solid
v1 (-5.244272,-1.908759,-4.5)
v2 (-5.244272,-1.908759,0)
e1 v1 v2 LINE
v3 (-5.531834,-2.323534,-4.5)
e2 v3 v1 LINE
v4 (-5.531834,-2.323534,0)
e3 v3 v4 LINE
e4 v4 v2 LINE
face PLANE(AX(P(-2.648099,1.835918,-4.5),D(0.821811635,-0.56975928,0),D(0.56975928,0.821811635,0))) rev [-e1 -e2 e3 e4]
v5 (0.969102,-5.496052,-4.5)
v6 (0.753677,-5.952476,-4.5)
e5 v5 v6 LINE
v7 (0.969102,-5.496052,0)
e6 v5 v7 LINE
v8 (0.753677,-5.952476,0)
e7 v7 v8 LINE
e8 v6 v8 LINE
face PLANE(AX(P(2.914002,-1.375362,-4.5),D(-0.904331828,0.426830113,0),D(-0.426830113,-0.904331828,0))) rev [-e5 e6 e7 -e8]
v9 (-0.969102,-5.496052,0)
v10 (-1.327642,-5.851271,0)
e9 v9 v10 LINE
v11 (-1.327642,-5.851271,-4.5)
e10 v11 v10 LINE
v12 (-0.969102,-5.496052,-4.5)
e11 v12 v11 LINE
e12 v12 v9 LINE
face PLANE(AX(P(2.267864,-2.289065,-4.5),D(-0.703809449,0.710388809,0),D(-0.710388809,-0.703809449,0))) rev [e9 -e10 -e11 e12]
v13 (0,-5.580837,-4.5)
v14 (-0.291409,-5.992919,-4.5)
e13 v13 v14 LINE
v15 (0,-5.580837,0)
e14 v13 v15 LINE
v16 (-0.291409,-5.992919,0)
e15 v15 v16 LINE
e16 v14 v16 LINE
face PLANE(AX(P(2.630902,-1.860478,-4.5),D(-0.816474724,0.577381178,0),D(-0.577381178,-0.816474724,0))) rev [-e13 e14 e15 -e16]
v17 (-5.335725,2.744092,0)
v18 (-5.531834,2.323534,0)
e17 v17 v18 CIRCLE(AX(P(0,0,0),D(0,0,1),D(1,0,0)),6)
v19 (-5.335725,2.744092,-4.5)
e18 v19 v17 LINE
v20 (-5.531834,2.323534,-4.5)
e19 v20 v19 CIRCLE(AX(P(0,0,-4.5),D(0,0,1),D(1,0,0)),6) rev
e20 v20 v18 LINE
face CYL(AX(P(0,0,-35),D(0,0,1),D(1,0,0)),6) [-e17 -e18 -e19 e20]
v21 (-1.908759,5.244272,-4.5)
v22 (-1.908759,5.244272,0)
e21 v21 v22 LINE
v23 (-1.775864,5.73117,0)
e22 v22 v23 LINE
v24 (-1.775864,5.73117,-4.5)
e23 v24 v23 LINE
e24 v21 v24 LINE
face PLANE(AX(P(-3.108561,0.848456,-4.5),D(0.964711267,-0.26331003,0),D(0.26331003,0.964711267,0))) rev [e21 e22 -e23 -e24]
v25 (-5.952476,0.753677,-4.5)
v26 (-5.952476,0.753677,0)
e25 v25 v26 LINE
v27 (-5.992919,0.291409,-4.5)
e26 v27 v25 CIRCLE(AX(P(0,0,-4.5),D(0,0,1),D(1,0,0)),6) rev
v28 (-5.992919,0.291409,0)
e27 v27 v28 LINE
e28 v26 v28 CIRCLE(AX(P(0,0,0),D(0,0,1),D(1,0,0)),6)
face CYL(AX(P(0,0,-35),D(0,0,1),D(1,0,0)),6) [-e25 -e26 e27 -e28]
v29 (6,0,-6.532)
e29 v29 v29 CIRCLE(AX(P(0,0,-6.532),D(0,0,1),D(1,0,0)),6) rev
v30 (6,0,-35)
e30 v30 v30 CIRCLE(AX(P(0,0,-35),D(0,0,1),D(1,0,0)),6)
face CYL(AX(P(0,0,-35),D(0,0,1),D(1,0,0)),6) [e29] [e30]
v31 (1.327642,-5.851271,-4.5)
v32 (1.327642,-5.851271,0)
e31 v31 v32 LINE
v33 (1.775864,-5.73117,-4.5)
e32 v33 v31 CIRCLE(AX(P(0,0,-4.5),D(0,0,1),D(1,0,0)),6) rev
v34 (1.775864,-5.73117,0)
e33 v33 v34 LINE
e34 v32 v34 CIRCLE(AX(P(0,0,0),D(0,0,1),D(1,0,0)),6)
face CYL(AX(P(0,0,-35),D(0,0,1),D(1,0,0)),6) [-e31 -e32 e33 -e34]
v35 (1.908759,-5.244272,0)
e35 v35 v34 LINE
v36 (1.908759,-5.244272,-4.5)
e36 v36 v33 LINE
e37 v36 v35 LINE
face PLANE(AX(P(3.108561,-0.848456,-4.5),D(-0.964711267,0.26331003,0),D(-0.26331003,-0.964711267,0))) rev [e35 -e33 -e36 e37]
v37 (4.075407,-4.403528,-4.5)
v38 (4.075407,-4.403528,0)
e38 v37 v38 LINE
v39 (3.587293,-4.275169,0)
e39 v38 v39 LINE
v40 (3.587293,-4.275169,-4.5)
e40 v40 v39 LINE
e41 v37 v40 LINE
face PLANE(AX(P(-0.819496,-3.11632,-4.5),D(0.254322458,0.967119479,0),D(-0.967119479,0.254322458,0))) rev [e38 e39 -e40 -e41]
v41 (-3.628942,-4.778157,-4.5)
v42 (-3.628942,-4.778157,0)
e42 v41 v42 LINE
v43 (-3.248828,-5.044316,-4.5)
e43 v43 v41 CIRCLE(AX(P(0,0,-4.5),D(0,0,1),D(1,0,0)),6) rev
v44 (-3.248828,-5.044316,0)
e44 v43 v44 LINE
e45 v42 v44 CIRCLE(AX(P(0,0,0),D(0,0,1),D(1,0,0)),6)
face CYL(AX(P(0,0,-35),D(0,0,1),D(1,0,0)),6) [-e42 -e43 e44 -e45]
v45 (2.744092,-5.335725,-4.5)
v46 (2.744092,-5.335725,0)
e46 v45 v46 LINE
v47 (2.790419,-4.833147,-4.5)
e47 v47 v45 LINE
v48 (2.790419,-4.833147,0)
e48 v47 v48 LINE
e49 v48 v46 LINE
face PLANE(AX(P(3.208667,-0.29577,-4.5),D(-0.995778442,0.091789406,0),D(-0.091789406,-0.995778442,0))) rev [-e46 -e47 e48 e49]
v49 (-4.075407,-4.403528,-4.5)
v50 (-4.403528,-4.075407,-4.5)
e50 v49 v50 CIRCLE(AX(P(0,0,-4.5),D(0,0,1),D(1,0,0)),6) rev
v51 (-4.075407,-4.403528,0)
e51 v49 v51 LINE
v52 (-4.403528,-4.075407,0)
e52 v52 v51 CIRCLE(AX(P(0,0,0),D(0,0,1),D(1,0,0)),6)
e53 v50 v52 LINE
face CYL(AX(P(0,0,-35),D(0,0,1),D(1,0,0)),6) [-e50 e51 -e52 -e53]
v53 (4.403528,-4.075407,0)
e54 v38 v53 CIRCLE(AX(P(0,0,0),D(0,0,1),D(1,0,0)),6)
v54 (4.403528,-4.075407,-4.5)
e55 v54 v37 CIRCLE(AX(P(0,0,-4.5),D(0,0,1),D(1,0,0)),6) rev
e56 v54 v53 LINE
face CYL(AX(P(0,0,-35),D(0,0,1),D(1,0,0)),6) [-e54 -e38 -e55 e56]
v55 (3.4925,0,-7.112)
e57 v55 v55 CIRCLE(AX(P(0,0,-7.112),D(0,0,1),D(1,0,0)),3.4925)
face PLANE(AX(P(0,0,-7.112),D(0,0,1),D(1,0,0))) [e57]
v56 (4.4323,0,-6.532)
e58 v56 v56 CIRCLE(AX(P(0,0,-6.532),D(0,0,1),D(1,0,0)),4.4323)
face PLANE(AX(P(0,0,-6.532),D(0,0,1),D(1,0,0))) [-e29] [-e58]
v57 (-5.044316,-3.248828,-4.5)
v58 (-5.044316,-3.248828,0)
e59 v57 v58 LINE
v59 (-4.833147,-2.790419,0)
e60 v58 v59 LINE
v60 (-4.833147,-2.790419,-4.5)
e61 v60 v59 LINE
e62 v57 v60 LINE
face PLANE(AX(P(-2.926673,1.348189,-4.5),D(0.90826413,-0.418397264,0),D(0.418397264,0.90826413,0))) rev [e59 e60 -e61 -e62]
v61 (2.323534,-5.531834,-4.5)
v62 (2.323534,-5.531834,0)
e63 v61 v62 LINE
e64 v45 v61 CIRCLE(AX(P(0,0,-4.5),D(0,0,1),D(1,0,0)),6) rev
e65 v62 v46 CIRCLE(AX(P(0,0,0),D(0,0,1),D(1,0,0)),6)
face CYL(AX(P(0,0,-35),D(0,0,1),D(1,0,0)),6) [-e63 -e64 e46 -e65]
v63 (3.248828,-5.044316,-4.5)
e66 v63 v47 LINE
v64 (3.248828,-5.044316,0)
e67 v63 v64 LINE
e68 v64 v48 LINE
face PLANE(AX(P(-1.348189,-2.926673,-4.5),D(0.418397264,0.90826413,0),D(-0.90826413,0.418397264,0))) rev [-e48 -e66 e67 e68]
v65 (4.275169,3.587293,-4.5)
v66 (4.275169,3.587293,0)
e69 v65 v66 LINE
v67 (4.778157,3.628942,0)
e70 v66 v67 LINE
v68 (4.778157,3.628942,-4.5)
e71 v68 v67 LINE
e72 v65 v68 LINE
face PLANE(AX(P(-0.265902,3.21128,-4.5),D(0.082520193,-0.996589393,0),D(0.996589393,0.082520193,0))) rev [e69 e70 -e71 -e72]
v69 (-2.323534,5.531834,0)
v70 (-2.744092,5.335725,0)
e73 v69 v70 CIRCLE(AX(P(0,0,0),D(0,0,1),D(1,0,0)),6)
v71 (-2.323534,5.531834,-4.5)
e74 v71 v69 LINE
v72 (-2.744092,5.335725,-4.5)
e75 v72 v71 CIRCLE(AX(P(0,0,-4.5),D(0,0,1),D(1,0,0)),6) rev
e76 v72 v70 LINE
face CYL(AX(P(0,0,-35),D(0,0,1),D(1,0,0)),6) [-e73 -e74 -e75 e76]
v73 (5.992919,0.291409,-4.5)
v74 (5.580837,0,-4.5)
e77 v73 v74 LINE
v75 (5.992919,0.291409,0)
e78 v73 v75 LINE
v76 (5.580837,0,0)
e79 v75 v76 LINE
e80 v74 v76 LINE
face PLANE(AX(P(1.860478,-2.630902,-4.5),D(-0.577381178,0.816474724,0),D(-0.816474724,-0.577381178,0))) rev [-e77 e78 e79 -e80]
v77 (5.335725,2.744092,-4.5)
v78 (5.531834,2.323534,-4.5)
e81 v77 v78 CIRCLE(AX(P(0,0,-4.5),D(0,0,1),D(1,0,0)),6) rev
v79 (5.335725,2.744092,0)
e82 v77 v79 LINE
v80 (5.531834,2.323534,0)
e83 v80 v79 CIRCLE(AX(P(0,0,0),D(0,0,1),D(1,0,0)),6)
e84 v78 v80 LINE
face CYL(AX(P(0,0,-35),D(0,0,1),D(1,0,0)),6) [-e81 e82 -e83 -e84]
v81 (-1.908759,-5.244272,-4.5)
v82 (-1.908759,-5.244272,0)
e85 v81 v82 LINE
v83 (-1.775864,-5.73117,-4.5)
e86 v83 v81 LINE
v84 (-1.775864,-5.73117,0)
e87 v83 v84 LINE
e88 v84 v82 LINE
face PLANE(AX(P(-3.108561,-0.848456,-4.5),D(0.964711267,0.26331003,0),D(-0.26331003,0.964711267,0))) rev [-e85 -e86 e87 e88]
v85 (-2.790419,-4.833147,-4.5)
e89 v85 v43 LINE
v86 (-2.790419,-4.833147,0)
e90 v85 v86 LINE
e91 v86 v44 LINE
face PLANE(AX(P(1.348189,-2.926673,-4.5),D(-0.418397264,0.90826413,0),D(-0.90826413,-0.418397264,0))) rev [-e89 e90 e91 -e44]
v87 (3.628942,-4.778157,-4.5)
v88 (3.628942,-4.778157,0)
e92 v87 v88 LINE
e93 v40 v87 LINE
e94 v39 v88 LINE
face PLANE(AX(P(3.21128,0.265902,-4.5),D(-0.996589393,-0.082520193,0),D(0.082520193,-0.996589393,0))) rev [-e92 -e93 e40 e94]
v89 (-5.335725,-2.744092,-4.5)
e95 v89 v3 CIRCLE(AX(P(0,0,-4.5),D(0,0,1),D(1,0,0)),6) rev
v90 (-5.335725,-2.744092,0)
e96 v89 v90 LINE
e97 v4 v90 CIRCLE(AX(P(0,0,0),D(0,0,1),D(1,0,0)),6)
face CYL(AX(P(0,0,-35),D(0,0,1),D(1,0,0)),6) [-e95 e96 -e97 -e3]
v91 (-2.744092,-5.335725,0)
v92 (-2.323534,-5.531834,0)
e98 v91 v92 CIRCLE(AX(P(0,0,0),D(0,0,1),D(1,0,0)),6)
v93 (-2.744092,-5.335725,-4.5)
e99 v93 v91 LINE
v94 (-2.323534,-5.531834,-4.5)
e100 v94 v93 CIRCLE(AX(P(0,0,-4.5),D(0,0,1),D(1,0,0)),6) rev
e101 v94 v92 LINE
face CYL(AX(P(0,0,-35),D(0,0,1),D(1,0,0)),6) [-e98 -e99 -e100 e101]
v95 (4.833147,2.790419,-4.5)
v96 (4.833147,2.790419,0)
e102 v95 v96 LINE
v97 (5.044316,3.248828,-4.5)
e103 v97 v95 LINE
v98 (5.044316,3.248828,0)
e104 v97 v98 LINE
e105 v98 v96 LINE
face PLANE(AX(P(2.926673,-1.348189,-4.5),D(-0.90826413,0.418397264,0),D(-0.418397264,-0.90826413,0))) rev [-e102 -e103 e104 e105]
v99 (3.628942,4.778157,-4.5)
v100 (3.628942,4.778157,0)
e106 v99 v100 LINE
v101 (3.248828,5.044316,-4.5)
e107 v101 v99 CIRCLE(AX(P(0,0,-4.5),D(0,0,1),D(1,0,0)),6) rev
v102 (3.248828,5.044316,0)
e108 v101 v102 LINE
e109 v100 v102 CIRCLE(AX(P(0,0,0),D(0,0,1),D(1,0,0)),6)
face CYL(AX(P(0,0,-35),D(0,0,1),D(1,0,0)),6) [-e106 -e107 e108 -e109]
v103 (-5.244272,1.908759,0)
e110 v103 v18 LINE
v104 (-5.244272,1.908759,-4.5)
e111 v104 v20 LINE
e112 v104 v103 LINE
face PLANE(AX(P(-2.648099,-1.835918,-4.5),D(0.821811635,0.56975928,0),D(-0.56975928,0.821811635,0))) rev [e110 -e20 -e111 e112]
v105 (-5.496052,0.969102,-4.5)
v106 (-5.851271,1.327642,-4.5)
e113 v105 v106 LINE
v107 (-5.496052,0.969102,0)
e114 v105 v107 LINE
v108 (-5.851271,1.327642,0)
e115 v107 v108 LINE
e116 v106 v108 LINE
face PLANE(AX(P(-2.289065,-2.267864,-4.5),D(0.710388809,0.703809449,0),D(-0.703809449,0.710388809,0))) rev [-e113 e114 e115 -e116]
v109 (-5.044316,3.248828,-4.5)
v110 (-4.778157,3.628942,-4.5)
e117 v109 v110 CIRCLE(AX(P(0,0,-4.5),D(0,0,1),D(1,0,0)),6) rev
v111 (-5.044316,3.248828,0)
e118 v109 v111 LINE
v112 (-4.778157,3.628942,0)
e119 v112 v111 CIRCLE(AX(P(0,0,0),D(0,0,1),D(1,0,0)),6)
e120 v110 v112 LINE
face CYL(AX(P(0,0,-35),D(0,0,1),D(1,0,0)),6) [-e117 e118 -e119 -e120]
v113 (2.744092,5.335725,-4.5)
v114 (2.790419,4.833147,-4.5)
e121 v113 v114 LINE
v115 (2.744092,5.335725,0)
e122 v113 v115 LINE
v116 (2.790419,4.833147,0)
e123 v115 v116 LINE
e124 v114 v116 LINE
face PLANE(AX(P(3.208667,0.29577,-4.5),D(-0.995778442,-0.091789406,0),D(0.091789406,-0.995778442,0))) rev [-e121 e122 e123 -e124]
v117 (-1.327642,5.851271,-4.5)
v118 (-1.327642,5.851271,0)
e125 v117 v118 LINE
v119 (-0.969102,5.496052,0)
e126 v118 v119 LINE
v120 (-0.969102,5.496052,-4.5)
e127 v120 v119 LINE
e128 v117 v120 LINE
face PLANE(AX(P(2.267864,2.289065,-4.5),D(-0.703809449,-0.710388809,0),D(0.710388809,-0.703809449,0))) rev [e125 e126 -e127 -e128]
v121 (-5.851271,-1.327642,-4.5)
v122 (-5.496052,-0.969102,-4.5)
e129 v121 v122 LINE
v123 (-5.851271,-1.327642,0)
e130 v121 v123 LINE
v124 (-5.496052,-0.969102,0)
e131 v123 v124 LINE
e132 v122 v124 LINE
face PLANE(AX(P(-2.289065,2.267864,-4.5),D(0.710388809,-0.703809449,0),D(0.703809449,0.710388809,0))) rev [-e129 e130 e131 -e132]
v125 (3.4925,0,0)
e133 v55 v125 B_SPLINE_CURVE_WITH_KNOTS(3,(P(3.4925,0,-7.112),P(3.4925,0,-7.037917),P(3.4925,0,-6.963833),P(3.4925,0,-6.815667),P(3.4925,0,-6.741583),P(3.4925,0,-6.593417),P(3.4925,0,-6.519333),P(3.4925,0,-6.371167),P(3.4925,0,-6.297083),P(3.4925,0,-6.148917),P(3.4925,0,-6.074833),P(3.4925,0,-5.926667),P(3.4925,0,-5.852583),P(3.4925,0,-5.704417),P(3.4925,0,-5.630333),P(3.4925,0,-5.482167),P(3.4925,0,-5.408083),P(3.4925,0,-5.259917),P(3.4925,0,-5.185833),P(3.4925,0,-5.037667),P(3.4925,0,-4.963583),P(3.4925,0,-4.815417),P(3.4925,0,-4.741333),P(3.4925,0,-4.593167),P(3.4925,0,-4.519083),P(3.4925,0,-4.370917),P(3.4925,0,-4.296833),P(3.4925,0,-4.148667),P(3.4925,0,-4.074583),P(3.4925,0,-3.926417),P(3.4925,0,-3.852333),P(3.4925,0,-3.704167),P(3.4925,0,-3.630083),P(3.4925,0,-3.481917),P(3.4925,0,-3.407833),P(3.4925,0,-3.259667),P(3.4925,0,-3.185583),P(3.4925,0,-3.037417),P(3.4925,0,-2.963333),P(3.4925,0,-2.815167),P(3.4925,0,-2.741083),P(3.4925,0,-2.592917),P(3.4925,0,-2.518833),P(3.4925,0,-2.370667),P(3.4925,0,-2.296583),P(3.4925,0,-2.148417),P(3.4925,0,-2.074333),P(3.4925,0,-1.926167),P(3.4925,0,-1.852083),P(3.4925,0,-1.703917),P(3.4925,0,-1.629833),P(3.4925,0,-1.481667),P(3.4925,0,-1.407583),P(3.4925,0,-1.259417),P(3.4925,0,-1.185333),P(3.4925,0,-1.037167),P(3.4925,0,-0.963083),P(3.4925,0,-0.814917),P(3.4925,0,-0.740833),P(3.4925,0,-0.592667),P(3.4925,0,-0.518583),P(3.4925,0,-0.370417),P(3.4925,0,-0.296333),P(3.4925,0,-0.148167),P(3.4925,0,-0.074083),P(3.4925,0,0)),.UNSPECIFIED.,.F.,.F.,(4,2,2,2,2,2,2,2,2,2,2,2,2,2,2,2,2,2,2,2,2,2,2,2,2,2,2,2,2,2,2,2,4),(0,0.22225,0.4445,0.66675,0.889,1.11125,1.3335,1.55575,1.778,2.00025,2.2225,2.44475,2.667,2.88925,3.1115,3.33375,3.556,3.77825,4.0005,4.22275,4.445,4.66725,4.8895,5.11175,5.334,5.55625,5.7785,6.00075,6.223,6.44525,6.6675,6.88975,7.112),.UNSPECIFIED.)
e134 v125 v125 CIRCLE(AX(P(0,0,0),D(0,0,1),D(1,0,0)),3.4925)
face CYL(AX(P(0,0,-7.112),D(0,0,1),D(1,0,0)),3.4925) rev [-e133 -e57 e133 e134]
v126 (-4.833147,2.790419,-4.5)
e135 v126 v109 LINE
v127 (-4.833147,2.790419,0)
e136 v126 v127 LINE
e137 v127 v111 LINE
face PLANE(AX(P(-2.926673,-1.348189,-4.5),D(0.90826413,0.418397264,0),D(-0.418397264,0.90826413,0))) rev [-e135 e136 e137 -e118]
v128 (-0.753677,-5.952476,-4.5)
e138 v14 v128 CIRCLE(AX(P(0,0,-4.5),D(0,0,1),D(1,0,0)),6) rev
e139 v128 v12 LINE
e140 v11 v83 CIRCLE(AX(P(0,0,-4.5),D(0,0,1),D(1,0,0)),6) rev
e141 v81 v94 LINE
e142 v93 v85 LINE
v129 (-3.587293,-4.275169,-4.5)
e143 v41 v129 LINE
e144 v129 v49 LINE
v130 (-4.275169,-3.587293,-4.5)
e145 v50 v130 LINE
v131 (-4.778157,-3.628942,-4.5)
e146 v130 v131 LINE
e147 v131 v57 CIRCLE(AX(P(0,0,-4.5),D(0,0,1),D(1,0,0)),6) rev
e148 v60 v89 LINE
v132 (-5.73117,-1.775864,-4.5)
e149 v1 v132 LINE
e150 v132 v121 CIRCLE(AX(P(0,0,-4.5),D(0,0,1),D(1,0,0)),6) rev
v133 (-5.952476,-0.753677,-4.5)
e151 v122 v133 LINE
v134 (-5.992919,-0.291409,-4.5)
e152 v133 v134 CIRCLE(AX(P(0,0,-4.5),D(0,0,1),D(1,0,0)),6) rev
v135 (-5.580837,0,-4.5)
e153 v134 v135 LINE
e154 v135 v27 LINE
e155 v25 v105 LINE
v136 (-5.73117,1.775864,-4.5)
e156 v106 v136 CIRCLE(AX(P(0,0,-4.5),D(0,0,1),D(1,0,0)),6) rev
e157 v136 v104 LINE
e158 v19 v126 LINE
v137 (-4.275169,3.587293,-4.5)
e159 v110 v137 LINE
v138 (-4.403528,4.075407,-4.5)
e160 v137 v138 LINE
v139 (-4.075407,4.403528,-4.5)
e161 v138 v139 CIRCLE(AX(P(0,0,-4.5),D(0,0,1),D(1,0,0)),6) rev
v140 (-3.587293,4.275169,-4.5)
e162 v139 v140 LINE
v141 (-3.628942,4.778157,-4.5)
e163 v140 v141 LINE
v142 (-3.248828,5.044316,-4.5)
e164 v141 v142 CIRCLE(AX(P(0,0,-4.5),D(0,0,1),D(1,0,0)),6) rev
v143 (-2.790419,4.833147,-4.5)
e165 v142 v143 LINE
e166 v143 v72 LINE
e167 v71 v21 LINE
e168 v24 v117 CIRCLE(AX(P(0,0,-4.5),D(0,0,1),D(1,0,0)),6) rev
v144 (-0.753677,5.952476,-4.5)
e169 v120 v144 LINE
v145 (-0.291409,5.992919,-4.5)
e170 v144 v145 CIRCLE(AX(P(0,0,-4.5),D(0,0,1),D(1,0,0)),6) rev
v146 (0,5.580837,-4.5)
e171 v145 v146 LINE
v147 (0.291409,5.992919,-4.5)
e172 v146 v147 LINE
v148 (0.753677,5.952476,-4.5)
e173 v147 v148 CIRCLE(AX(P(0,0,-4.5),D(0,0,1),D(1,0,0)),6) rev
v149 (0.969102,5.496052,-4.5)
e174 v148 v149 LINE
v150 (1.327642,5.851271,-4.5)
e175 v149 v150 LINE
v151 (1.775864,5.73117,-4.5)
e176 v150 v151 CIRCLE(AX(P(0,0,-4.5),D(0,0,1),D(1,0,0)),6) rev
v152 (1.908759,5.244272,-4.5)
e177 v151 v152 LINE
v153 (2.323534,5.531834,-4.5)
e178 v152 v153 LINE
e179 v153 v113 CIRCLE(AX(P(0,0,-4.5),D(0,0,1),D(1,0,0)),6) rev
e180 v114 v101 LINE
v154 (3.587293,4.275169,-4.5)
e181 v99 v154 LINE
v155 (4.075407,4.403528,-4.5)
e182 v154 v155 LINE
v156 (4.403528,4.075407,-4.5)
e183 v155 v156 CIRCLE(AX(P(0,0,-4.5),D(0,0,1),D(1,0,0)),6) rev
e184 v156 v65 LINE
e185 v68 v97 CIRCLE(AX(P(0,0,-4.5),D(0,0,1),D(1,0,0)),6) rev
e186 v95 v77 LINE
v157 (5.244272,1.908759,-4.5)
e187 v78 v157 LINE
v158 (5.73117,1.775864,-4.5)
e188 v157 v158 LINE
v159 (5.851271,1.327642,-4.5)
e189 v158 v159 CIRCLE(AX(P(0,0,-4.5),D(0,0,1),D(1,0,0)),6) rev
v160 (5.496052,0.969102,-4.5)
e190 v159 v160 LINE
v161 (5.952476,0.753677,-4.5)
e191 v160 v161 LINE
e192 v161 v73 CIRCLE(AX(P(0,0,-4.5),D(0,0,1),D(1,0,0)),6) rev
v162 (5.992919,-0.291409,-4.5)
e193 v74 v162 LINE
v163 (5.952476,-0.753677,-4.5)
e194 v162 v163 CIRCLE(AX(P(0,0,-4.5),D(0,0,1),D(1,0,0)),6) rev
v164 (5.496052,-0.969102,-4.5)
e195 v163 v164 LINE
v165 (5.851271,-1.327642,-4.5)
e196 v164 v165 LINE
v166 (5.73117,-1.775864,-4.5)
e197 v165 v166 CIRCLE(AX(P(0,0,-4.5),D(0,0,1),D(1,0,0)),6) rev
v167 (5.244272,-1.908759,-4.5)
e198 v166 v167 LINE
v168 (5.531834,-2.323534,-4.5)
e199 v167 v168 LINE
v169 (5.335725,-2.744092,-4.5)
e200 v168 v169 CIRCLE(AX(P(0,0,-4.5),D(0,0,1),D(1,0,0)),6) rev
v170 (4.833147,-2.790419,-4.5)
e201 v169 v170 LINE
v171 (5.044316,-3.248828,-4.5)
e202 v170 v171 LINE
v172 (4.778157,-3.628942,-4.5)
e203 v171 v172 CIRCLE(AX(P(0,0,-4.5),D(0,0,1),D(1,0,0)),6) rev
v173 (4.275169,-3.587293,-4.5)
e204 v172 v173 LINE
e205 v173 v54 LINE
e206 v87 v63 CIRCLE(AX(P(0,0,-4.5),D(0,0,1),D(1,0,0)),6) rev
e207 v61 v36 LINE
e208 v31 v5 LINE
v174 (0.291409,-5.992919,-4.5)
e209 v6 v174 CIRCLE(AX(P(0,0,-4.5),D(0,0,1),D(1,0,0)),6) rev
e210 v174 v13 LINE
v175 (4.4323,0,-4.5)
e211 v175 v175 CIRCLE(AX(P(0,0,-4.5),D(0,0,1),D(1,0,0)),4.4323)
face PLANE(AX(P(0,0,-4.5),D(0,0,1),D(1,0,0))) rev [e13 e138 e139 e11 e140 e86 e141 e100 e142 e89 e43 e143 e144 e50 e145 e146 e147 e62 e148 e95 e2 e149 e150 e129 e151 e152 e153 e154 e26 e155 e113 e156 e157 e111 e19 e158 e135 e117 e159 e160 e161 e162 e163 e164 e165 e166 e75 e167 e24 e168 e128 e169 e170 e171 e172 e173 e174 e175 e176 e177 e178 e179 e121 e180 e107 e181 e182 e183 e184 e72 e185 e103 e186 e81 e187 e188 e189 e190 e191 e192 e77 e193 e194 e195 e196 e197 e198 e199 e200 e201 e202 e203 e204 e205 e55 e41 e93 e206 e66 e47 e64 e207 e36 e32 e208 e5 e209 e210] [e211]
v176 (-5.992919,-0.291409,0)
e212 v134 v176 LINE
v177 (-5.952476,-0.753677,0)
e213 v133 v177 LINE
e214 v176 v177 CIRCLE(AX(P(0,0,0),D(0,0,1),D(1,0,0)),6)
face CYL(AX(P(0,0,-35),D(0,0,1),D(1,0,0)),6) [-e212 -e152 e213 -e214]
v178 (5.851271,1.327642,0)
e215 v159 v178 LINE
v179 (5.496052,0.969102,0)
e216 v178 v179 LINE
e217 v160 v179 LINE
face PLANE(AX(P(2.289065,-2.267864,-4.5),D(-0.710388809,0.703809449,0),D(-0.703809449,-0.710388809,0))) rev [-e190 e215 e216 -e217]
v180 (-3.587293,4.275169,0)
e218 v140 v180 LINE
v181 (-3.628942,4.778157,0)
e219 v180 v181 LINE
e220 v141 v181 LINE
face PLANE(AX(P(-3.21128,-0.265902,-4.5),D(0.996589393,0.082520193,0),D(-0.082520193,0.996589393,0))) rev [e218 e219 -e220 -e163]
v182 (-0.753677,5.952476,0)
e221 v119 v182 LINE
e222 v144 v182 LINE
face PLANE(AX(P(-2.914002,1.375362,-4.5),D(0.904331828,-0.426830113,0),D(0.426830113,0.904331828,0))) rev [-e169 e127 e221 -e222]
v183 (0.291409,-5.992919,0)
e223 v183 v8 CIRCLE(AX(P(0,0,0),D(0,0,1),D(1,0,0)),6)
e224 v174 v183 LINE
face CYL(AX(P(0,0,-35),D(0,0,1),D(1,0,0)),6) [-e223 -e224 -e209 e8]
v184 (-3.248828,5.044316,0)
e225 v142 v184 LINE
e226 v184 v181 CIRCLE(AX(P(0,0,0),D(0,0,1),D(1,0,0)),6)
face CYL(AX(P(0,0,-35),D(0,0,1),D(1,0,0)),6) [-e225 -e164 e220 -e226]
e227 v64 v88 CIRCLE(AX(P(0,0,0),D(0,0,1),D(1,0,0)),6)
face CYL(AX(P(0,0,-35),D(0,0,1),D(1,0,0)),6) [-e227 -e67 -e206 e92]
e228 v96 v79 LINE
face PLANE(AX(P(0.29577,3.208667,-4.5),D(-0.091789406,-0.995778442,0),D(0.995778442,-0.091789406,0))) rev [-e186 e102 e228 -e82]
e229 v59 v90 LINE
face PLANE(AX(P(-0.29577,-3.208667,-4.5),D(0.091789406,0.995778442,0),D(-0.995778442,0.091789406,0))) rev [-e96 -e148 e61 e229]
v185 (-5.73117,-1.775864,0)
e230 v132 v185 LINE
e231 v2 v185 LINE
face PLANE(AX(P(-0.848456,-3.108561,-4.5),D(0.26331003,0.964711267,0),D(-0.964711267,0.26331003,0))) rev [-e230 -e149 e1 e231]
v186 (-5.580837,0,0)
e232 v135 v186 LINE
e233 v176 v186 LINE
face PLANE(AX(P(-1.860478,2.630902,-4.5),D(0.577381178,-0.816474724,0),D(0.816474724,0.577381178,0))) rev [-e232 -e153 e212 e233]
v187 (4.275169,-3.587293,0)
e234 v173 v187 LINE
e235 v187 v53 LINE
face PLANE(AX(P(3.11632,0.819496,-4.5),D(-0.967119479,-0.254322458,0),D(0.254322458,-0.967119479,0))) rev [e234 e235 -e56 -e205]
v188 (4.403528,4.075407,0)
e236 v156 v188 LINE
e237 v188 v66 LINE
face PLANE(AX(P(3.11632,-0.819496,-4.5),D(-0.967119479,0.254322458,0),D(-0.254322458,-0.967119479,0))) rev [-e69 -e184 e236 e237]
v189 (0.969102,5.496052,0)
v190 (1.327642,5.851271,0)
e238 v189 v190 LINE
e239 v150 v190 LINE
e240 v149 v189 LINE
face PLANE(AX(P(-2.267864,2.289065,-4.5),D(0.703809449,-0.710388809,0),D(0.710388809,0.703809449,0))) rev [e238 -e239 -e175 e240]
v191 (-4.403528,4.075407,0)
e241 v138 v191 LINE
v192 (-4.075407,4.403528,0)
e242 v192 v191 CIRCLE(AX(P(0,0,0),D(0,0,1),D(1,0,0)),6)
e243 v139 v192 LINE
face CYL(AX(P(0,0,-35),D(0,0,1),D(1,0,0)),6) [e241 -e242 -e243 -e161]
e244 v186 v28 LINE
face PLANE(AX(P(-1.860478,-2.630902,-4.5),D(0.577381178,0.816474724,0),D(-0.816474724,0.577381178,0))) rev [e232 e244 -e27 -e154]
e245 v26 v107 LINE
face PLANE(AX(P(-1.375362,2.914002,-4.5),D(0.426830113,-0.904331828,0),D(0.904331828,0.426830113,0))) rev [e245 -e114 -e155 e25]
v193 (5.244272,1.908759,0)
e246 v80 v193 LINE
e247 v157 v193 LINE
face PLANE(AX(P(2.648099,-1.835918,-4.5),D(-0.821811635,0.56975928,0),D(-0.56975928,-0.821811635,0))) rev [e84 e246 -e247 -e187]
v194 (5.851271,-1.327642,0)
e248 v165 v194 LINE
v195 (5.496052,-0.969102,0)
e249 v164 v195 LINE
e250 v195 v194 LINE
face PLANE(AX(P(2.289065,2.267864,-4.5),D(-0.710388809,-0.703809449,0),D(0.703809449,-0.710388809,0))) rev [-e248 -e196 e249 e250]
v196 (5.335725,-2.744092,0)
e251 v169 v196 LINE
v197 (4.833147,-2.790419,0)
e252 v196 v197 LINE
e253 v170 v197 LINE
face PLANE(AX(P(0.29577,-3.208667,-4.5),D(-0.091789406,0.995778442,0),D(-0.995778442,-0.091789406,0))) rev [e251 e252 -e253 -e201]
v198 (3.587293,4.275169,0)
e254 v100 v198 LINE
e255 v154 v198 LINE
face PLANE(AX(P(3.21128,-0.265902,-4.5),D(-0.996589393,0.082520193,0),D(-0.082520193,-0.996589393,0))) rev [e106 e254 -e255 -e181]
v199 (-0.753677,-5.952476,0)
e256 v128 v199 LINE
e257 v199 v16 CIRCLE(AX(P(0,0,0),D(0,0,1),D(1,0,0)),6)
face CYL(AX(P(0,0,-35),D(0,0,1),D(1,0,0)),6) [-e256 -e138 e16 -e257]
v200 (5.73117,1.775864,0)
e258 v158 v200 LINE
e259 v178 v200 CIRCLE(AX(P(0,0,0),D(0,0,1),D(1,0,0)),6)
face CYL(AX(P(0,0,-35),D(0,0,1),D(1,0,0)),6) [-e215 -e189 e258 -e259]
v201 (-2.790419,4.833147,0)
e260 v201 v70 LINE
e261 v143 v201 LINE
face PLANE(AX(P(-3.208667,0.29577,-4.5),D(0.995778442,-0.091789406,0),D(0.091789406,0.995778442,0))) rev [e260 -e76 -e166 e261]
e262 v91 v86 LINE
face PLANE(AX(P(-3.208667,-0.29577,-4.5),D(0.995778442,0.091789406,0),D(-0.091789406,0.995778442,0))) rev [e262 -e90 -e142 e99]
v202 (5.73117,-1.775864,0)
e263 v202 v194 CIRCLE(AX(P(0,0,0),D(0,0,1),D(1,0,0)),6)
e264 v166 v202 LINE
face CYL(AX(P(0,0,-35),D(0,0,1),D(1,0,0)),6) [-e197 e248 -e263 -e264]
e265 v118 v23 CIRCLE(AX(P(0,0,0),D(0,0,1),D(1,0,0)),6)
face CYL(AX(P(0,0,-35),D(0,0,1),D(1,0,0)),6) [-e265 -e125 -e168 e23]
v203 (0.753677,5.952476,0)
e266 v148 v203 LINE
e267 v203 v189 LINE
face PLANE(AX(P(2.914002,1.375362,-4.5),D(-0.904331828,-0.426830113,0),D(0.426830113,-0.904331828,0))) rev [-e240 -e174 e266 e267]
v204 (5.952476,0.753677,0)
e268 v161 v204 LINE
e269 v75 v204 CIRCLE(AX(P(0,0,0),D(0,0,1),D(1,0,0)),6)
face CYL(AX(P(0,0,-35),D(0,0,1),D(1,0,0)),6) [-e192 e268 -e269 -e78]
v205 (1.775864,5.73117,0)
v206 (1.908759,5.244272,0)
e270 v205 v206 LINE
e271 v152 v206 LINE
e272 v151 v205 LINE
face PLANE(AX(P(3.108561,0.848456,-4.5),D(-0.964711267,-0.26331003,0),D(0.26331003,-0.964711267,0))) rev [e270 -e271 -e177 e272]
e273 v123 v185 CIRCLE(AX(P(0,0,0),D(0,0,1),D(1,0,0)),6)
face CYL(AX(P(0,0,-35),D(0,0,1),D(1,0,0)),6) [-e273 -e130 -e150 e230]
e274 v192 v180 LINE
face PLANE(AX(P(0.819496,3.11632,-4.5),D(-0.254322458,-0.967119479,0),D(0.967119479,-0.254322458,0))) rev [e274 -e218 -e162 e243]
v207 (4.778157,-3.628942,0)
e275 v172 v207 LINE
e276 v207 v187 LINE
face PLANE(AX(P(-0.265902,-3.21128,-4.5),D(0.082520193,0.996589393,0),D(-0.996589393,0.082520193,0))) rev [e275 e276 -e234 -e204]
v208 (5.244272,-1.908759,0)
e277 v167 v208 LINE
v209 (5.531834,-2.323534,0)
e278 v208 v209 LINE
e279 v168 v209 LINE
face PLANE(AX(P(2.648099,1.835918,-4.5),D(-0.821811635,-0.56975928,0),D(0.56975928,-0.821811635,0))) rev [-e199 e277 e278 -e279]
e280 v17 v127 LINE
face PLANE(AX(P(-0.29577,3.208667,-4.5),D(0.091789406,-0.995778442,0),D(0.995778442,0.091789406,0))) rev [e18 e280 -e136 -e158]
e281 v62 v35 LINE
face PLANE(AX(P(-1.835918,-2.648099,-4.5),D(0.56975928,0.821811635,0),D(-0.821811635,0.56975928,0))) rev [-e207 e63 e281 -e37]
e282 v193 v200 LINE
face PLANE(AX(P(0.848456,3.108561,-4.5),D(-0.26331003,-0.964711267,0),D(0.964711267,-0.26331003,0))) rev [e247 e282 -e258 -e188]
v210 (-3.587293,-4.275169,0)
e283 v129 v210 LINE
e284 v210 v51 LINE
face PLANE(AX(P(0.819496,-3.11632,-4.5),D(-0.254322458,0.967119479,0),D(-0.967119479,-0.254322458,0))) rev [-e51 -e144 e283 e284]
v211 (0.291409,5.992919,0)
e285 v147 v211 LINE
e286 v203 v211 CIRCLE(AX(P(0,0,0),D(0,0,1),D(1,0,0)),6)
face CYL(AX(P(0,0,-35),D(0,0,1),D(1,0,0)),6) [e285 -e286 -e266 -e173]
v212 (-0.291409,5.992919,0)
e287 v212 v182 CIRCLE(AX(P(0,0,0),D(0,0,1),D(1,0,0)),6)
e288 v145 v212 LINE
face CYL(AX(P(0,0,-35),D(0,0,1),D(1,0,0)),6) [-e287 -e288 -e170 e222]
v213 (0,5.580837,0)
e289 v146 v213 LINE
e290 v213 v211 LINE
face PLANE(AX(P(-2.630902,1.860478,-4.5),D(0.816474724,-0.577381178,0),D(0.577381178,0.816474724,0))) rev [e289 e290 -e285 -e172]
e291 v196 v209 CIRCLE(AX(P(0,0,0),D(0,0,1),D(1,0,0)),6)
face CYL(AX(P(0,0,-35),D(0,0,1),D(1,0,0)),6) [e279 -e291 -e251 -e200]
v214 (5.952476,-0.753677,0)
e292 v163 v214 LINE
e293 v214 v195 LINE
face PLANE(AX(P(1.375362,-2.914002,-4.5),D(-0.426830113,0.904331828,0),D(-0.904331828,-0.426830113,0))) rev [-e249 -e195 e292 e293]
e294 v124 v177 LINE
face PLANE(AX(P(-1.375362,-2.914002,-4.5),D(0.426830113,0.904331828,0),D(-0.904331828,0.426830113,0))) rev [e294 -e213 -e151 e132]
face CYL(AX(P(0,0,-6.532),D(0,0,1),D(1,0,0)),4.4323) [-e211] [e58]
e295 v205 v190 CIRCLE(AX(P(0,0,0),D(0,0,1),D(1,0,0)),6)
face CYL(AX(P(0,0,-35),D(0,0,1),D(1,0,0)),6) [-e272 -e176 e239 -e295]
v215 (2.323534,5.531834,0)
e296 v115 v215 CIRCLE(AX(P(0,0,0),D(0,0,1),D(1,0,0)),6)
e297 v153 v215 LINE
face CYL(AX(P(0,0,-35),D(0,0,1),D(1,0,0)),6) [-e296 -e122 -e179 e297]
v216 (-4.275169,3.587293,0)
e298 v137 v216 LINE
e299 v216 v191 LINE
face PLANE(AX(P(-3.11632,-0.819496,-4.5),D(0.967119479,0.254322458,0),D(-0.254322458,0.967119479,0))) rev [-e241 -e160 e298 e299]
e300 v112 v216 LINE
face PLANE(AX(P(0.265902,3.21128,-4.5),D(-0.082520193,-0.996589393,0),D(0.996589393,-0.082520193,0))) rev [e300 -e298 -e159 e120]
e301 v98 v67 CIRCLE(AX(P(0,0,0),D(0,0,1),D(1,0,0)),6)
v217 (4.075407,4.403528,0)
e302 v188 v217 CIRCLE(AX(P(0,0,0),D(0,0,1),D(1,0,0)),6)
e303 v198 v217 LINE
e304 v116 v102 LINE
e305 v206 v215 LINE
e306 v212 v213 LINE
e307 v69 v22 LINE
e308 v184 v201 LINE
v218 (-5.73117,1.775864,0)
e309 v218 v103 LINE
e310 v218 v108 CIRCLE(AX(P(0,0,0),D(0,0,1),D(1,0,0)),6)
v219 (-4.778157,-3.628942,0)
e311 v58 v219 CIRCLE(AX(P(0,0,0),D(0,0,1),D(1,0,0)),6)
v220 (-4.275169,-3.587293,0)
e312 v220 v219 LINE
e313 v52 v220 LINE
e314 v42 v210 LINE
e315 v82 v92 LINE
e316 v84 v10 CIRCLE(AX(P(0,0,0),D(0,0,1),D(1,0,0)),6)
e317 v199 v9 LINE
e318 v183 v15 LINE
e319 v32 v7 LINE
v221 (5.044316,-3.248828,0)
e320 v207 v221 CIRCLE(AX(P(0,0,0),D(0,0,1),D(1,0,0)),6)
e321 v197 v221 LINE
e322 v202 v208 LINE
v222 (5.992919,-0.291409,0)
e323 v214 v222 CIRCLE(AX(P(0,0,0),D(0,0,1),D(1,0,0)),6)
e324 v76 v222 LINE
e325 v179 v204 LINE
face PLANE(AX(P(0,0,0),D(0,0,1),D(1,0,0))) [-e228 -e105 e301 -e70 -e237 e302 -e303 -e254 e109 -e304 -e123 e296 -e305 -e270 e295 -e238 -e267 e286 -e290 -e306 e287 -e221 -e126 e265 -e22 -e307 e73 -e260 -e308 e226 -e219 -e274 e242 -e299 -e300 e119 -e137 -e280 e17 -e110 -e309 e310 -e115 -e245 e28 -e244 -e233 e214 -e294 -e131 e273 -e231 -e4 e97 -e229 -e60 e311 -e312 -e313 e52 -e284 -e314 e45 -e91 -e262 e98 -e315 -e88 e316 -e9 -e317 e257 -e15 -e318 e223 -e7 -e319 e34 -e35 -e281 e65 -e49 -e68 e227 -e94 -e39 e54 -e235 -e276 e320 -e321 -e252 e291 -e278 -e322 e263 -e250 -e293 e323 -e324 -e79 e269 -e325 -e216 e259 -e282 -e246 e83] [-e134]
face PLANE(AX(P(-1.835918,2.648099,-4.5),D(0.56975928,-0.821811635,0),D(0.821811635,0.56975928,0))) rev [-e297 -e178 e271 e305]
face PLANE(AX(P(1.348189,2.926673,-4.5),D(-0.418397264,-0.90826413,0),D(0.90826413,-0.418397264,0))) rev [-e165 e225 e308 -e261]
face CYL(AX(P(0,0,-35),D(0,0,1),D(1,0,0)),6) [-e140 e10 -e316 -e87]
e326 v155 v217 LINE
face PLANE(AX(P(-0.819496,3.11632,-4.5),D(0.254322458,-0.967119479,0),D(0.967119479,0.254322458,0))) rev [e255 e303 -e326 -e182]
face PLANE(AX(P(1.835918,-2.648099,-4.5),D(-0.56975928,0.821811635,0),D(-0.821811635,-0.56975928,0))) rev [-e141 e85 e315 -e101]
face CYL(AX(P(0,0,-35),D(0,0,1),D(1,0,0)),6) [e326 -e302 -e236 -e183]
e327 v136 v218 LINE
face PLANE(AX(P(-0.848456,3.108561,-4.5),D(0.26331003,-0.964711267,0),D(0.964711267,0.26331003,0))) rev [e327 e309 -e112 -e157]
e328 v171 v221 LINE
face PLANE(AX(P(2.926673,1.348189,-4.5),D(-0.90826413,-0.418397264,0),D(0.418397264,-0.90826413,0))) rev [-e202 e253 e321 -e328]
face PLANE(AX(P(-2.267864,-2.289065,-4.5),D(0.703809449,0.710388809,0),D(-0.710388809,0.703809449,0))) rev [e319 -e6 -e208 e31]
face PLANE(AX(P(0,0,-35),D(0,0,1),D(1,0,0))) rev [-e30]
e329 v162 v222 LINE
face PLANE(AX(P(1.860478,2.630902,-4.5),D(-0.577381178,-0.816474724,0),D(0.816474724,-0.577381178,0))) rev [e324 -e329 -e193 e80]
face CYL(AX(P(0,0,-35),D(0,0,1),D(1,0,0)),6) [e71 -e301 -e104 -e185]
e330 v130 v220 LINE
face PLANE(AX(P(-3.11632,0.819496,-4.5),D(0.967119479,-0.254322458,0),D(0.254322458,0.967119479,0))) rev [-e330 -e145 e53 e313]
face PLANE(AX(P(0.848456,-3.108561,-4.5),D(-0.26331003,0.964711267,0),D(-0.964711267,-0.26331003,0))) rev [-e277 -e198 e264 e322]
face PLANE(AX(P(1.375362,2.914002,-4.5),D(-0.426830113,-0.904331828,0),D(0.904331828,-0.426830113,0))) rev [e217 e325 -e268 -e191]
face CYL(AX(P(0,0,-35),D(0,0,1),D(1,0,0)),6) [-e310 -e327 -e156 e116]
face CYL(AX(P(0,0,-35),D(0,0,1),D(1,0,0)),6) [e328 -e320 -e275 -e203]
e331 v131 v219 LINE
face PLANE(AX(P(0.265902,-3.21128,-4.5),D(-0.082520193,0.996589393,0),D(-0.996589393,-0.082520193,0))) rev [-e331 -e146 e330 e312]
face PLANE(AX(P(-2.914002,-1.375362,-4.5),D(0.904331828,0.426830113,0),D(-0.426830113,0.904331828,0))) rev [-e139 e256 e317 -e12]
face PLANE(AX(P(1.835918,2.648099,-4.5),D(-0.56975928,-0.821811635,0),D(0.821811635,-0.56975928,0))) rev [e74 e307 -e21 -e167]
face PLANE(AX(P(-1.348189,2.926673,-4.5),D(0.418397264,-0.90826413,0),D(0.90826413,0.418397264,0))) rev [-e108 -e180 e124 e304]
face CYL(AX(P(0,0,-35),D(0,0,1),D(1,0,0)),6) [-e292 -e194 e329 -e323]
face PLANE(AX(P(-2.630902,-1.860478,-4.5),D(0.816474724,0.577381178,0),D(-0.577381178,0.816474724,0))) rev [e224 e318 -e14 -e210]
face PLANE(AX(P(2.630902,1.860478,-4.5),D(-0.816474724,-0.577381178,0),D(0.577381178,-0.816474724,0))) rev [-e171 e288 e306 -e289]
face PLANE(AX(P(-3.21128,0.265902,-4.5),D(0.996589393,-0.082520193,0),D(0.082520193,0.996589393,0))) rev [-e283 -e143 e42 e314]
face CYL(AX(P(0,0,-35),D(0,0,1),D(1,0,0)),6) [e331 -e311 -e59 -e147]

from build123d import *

# Parameters (mm, degrees)
SKETCH1_R           = 6
BOSS_EXTRUDE1_DEPTH = 35
SKETCH4_OUTSIDE_W   = 21.78
SKETCH4_OUTSIDE_H   = 21.78
CUT_EXTRUDE5_DEPTH  = 4.5
SKETCH6_R           = 6.880488524
SKETCH6_R_2         = 4.4323
CUT_EXTRUDE6_DEPTH  = 2.032
SKETCH7_R           = 3.4925
CUT_EXTRUDE7_DEPTH  = 7.112


with BuildPart() as part:
    # Sketch1 → Boss-Extrude1 (new body)
    with BuildSketch(Plane.XY):
        Circle(SKETCH1_R)
    extrude(amount=-BOSS_EXTRUDE1_DEPTH)

    # Sketch4 outside → Cut-Extrude5 (cut)
    with BuildSketch(Plane.XY):
        Rectangle(SKETCH4_OUTSIDE_W, SKETCH4_OUTSIDE_H)
        with BuildLine():
            Line((5.5808372, 0), (5.992919203, 0.291409379))
            ThreePointArc((5.992919203, 0.291409379), (5.977168189, 0.522934456), (5.952476002, 0.753677283))
            Line((5.952476002, 0.753677283), (5.496051743, 0.96910221))
            Line((5.496051743, 0.96910221), (5.851270587, 1.327641714))
            ThreePointArc((5.851270587, 1.327641714), (5.795554958, 1.552914271), (5.73116983, 1.775863842))
            Line((5.73116983, 1.775863842), (5.244271535, 1.908758739))
            Line((5.244271535, 1.908758739), (5.531834074, 2.323534328))
            ThreePointArc((5.531834074, 2.323534328), (5.437846722, 2.53570957), (5.335724962, 2.744091676))
            Line((5.335724962, 2.744091676), (4.83314679, 2.7904186))
            Line((4.83314679, 2.7904186), (5.044315583, 3.248827527))
            ThreePointArc((5.044315583, 3.248827527), (4.914912266, 3.441458618), (4.778156792, 3.628941674))
            Line((4.778156792, 3.628941674), (4.275169325, 3.587293004))
            Line((4.275169325, 3.587293004), (4.403528115, 4.075406745))
            ThreePointArc((4.403528115, 4.075406745), (4.242640687, 4.242640687), (4.075406745, 4.403528115))
            Line((4.075406745, 4.403528115), (3.587293004, 4.275169325))
            Line((3.587293004, 4.275169325), (3.628941674, 4.778156792))
            ThreePointArc((3.628941674, 4.778156792), (3.441458618, 4.914912266), (3.248827527, 5.044315583))
            Line((3.248827527, 5.044315583), (2.7904186, 4.83314679))
            Line((2.7904186, 4.83314679), (2.744091676, 5.335724962))
            ThreePointArc((2.744091676, 5.335724962), (2.53570957, 5.437846722), (2.323534328, 5.531834074))
            Line((2.323534328, 5.531834074), (1.908758739, 5.244271535))
            Line((1.908758739, 5.244271535), (1.775863842, 5.73116983))
            ThreePointArc((1.775863842, 5.73116983), (1.552914271, 5.795554958), (1.327641714, 5.851270587))
            Line((1.327641714, 5.851270587), (0.96910221, 5.496051743))
            Line((0.96910221, 5.496051743), (0.753677283, 5.952476002))
            ThreePointArc((0.753677283, 5.952476002), (0.522934456, 5.977168189), (0.291409379, 5.992919203))
            Line((0.291409379, 5.992919203), (0, 5.5808372))
            Line((0, 5.5808372), (-0.291409379, 5.992919203))
            ThreePointArc((-0.291409379, 5.992919203), (-0.522934456, 5.977168189), (-0.753677283, 5.952476002))
            Line((-0.753677283, 5.952476002), (-0.96910221, 5.496051743))
            Line((-0.96910221, 5.496051743), (-1.327641714, 5.851270587))
            ThreePointArc((-1.327641714, 5.851270587), (-1.552914271, 5.795554958), (-1.775863842, 5.73116983))
            Line((-1.775863842, 5.73116983), (-1.908758739, 5.244271535))
            Line((-1.908758739, 5.244271535), (-2.323534328, 5.531834074))
            ThreePointArc((-2.323534328, 5.531834074), (-2.53570957, 5.437846722), (-2.744091676, 5.335724962))
            Line((-2.744091676, 5.335724962), (-2.7904186, 4.83314679))
            Line((-2.7904186, 4.83314679), (-3.248827527, 5.044315583))
            ThreePointArc((-3.248827527, 5.044315583), (-3.441458618, 4.914912266), (-3.628941674, 4.778156792))
            Line((-3.628941674, 4.778156792), (-3.587293004, 4.275169325))
            Line((-3.587293004, 4.275169325), (-4.075406745, 4.403528115))
            ThreePointArc((-4.075406745, 4.403528115), (-4.242640687, 4.242640687), (-4.403528115, 4.075406745))
            Line((-4.403528115, 4.075406745), (-4.275169325, 3.587293004))
            Line((-4.275169325, 3.587293004), (-4.778156792, 3.628941674))
            ThreePointArc((-4.778156792, 3.628941674), (-4.914912266, 3.441458618), (-5.044315583, 3.248827527))
            Line((-5.044315583, 3.248827527), (-4.83314679, 2.7904186))
            Line((-4.83314679, 2.7904186), (-5.335724962, 2.744091676))
            ThreePointArc((-5.335724962, 2.744091676), (-5.437846722, 2.53570957), (-5.531834074, 2.323534328))
            Line((-5.531834074, 2.323534328), (-5.244271535, 1.908758739))
            Line((-5.244271535, 1.908758739), (-5.73116983, 1.775863842))
            ThreePointArc((-5.73116983, 1.775863842), (-5.795554958, 1.552914271), (-5.851270587, 1.327641714))
            Line((-5.851270587, 1.327641714), (-5.496051743, 0.96910221))
            Line((-5.496051743, 0.96910221), (-5.952476002, 0.753677283))
            ThreePointArc((-5.952476002, 0.753677283), (-5.977168189, 0.522934456), (-5.992919203, 0.291409379))
            Line((-5.992919203, 0.291409379), (-5.5808372, 0))
            Line((-5.5808372, 0), (-5.992919203, -0.291409379))
            ThreePointArc((-5.992919203, -0.291409379), (-5.977168189, -0.522934456), (-5.952476002, -0.753677283))
            Line((-5.952476002, -0.753677283), (-5.496051743, -0.96910221))
            Line((-5.496051743, -0.96910221), (-5.851270587, -1.327641714))
            ThreePointArc((-5.851270587, -1.327641714), (-5.795554958, -1.552914271), (-5.73116983, -1.775863842))
            Line((-5.73116983, -1.775863842), (-5.244271535, -1.908758739))
            Line((-5.244271535, -1.908758739), (-5.531834074, -2.323534328))
            ThreePointArc((-5.531834074, -2.323534328), (-5.437846722, -2.53570957), (-5.335724962, -2.744091676))
            Line((-5.335724962, -2.744091676), (-4.83314679, -2.7904186))
            Line((-4.83314679, -2.7904186), (-5.044315583, -3.248827527))
            ThreePointArc((-5.044315583, -3.248827527), (-4.914912266, -3.441458618), (-4.778156792, -3.628941674))
            Line((-4.778156792, -3.628941674), (-4.275169325, -3.587293004))
            Line((-4.275169325, -3.587293004), (-4.403528115, -4.075406745))
            ThreePointArc((-4.403528115, -4.075406745), (-4.242640687, -4.242640687), (-4.075406745, -4.403528115))
            Line((-4.075406745, -4.403528115), (-3.587293004, -4.275169325))
            Line((-3.587293004, -4.275169325), (-3.628941674, -4.778156792))
            ThreePointArc((-3.628941674, -4.778156792), (-3.441458618, -4.914912266), (-3.248827527, -5.044315583))
            Line((-3.248827527, -5.044315583), (-2.7904186, -4.83314679))
            Line((-2.7904186, -4.83314679), (-2.744091676, -5.335724962))
            ThreePointArc((-2.744091676, -5.335724962), (-2.53570957, -5.437846722), (-2.323534328, -5.531834074))
            Line((-2.323534328, -5.531834074), (-1.908758739, -5.244271535))
            Line((-1.908758739, -5.244271535), (-1.775863842, -5.73116983))
            ThreePointArc((-1.775863842, -5.73116983), (-1.552914271, -5.795554958), (-1.327641714, -5.851270587))
            Line((-1.327641714, -5.851270587), (-0.96910221, -5.496051743))
            Line((-0.96910221, -5.496051743), (-0.753677283, -5.952476002))
            ThreePointArc((-0.753677283, -5.952476002), (-0.522934456, -5.977168189), (-0.291409379, -5.992919203))
            Line((-0.291409379, -5.992919203), (0, -5.5808372))
            Line((0, -5.5808372), (0.291409379, -5.992919203))
            ThreePointArc((0.291409379, -5.992919203), (0.522934456, -5.977168189), (0.753677283, -5.952476002))
            Line((0.753677283, -5.952476002), (0.96910221, -5.496051743))
            Line((0.96910221, -5.496051743), (1.327641714, -5.851270587))
            ThreePointArc((1.327641714, -5.851270587), (1.552914271, -5.795554958), (1.775863842, -5.73116983))
            Line((1.775863842, -5.73116983), (1.908758739, -5.244271535))
            Line((1.908758739, -5.244271535), (2.323534328, -5.531834074))
            ThreePointArc((2.323534328, -5.531834074), (2.53570957, -5.437846722), (2.744091676, -5.335724962))
            Line((2.744091676, -5.335724962), (2.7904186, -4.83314679))
            Line((2.7904186, -4.83314679), (3.248827527, -5.044315583))
            ThreePointArc((3.248827527, -5.044315583), (3.441458618, -4.914912266), (3.628941674, -4.778156792))
            Line((3.628941674, -4.778156792), (3.587293004, -4.275169325))
            Line((3.587293004, -4.275169325), (4.075406745, -4.403528115))
            ThreePointArc((4.075406745, -4.403528115), (4.242640687, -4.242640687), (4.403528115, -4.075406745))
            Line((4.403528115, -4.075406745), (4.275169325, -3.587293004))
            Line((4.275169325, -3.587293004), (4.778156792, -3.628941674))
            ThreePointArc((4.778156792, -3.628941674), (4.914912266, -3.441458618), (5.044315583, -3.248827527))
            Line((5.044315583, -3.248827527), (4.83314679, -2.7904186))
            Line((4.83314679, -2.7904186), (5.335724962, -2.744091676))
            ThreePointArc((5.335724962, -2.744091676), (5.437846722, -2.53570957), (5.531834074, -2.323534328))
            Line((5.531834074, -2.323534328), (5.244271535, -1.908758739))
            Line((5.244271535, -1.908758739), (5.73116983, -1.775863842))
            ThreePointArc((5.73116983, -1.775863842), (5.795554958, -1.552914271), (5.851270587, -1.327641714))
            Line((5.851270587, -1.327641714), (5.496051743, -0.96910221))
            Line((5.496051743, -0.96910221), (5.952476002, -0.753677283))
            ThreePointArc((5.952476002, -0.753677283), (5.977168189, -0.522934456), (5.992919203, -0.291409379))
            Line((5.992919203, -0.291409379), (5.5808372, 0))
        make_face(mode=Mode.SUBTRACT)
    extrude(amount=-CUT_EXTRUDE5_DEPTH, mode=Mode.SUBTRACT)

    # Sketch6 → Cut-Extrude6 (cut)
    with BuildSketch(Plane.XY.offset(-4.5)):
        Circle(SKETCH6_R)
        Circle(SKETCH6_R_2, mode=Mode.SUBTRACT)
    extrude(amount=-CUT_EXTRUDE6_DEPTH, mode=Mode.SUBTRACT)

    # Sketch7 → Cut-Extrude7 (cut)
    with BuildSketch(Plane.XY):
        Circle(SKETCH7_R)
    extrude(amount=-CUT_EXTRUDE7_DEPTH, mode=Mode.SUBTRACT)


solid = part.part
